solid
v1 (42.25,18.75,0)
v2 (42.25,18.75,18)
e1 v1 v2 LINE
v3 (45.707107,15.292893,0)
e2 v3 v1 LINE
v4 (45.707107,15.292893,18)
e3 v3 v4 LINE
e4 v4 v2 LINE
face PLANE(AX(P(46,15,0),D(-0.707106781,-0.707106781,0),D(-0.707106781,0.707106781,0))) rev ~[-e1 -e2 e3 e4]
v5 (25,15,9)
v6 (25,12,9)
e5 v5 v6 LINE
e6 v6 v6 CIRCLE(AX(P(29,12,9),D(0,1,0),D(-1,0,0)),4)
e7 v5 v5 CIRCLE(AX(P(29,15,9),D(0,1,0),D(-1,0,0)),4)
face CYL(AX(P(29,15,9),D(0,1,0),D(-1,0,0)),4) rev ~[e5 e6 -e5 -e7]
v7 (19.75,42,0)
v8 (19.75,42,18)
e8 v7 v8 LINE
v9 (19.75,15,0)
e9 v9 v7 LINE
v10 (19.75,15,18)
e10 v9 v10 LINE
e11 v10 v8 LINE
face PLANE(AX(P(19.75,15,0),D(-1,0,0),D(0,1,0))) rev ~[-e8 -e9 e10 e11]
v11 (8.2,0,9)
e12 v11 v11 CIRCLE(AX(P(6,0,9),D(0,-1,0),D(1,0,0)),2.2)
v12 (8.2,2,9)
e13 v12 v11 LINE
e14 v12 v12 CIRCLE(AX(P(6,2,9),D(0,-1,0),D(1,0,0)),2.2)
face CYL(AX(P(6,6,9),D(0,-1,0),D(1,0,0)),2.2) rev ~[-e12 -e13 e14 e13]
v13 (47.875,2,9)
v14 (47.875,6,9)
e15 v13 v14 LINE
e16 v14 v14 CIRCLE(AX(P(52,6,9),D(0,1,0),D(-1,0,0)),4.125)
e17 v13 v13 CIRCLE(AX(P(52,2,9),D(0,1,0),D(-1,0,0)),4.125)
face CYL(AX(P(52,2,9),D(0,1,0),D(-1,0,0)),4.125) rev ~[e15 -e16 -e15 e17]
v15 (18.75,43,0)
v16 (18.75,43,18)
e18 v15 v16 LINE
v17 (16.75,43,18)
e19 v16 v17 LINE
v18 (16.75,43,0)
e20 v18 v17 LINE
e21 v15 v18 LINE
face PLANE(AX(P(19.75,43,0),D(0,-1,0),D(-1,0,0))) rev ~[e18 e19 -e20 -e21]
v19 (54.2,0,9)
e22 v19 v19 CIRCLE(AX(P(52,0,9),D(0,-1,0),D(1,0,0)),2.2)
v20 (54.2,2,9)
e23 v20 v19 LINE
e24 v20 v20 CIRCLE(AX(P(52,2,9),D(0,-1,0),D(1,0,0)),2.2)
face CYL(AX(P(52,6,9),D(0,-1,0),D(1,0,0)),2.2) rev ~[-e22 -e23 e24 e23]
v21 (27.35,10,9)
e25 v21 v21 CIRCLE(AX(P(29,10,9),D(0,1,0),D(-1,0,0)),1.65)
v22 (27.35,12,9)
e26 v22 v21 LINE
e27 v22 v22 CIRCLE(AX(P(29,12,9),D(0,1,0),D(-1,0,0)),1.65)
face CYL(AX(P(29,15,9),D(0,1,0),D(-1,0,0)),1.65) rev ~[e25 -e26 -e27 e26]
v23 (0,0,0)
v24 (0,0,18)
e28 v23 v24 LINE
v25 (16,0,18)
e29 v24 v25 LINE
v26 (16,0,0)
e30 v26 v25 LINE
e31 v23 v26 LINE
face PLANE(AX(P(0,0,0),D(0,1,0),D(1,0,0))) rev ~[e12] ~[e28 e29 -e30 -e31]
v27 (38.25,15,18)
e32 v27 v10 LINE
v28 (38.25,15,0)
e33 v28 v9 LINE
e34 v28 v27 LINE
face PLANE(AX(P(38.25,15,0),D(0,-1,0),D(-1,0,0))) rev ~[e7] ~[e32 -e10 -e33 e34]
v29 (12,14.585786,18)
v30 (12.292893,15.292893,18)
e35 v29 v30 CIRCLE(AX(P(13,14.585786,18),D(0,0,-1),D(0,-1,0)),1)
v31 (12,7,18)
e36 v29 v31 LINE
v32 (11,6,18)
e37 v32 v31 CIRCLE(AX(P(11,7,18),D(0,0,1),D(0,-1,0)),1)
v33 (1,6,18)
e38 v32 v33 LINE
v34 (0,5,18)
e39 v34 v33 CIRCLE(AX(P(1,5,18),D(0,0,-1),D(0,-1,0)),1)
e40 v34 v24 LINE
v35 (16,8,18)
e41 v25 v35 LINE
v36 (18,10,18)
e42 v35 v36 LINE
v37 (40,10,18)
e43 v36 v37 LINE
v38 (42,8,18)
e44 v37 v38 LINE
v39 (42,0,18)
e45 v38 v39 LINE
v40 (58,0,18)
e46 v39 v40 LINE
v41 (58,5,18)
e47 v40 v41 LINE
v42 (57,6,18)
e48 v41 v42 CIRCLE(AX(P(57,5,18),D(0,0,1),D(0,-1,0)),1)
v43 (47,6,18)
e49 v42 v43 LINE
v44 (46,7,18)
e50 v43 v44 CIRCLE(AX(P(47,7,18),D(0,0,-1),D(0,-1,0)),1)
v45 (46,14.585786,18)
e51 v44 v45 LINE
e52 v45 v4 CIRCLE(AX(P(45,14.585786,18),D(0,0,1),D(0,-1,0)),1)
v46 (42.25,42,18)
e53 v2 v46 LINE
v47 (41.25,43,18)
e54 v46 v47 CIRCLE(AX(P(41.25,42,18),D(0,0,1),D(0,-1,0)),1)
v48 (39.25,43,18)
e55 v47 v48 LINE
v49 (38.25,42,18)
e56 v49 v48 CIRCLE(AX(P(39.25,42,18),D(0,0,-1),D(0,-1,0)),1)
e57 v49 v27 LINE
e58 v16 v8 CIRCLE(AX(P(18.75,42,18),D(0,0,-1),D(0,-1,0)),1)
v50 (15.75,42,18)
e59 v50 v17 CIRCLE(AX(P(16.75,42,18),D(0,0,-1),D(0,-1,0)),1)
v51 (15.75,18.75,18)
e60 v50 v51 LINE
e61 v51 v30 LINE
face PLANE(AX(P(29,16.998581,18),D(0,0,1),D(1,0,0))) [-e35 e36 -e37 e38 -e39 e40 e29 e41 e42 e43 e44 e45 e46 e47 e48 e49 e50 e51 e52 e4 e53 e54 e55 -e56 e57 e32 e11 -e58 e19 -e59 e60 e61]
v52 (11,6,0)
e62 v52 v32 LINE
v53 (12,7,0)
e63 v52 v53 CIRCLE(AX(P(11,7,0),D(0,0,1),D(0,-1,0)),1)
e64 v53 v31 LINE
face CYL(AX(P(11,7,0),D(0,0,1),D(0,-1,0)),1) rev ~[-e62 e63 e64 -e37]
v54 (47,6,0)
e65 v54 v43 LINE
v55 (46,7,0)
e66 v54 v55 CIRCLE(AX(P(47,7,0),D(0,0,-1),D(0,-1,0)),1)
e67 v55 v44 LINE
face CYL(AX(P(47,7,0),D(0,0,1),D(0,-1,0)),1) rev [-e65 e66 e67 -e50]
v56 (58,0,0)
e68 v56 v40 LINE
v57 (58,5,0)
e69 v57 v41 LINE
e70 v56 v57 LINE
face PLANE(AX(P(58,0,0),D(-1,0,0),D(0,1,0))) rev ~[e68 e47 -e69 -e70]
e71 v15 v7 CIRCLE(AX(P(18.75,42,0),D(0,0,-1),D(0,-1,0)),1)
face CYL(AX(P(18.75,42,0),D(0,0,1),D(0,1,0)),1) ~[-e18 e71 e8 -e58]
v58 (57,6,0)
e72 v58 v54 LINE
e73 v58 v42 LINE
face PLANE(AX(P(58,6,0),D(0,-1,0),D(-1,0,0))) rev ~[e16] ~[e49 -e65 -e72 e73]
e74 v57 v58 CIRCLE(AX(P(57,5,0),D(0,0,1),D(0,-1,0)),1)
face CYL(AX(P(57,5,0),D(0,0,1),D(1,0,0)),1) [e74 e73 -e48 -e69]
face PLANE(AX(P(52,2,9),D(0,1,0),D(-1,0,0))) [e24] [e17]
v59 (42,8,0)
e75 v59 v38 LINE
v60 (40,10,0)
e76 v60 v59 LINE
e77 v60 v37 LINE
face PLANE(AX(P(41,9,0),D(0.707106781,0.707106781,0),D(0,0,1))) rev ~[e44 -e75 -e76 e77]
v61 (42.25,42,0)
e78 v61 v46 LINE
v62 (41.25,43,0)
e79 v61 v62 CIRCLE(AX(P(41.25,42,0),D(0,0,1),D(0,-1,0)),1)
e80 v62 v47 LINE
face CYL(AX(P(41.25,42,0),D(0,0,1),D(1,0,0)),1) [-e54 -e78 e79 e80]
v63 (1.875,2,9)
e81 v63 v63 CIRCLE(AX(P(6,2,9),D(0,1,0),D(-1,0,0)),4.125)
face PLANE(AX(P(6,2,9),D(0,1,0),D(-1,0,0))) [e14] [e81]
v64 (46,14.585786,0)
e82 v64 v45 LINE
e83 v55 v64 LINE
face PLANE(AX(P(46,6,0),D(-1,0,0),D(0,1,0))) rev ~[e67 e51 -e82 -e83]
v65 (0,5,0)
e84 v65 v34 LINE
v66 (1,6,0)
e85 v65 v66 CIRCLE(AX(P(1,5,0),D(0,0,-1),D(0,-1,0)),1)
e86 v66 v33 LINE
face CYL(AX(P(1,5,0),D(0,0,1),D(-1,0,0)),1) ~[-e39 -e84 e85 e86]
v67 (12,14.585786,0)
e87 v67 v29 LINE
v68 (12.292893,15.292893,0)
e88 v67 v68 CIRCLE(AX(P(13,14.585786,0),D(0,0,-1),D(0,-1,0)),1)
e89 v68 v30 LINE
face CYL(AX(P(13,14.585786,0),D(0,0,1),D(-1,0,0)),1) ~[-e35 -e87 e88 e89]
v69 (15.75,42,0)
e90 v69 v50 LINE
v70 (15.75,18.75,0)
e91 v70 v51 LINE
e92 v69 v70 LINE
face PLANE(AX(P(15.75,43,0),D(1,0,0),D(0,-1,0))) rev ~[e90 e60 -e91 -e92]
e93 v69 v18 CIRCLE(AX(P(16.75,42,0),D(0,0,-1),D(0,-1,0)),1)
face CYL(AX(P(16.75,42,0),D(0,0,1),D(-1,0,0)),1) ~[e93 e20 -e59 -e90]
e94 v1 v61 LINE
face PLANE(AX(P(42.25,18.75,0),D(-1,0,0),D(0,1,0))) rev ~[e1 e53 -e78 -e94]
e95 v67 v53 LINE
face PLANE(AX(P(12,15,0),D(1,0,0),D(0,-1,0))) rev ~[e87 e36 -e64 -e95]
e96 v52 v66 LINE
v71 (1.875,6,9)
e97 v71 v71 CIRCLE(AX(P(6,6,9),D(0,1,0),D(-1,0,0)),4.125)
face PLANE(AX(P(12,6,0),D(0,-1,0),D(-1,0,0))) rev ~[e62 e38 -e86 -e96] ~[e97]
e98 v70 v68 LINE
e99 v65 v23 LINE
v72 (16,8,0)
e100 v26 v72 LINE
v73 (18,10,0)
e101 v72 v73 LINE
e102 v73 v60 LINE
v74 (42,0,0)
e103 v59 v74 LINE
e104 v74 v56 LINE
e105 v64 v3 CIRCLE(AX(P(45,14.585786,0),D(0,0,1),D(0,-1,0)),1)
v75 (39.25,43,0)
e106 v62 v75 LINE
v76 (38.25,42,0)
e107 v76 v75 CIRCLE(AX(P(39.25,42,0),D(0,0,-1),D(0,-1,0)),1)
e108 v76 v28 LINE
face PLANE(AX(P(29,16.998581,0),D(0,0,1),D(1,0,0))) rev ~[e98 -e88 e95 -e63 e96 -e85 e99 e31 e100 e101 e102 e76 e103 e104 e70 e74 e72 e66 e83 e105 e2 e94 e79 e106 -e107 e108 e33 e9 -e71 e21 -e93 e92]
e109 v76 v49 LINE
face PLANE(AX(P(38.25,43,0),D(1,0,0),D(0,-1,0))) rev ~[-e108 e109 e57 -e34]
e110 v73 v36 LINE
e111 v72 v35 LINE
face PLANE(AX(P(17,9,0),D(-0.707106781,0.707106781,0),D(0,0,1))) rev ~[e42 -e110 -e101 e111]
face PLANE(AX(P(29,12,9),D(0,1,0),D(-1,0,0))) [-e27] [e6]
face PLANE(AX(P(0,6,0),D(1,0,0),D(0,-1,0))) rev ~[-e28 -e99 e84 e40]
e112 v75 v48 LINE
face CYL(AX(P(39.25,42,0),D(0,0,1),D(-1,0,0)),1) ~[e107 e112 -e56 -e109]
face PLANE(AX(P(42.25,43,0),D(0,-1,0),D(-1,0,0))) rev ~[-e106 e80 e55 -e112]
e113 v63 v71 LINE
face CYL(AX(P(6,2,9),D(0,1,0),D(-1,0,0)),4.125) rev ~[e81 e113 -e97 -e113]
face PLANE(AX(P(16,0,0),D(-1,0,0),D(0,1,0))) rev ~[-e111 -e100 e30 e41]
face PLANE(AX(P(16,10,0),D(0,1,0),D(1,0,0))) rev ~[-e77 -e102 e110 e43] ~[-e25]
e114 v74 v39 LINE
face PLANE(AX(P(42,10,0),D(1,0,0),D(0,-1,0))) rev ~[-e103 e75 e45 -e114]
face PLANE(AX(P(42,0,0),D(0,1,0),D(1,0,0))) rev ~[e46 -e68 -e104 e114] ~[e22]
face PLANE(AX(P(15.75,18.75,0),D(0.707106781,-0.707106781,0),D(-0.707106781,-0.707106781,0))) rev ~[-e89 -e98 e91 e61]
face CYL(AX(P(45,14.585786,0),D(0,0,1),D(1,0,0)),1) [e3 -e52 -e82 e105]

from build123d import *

# Parameters (mm, degrees)
F1_DEPTH             = 18
F4_D                 = 4.4
F4_CBORE_D           = 8.25
F4_CBORE_DEPTH       = 4
F4_ON_F3_D           = 4.4
F4_ON_F3_CBORE_D     = 8.25
F4_ON_F3_CBORE_DEPTH = 4
F5_SIZE              = 2
F6_R                 = 1
F7_R                 = 1.65
F8_DEPTH             = 15.001
F9_R                 = 4
F10_DEPTH            = 3


with BuildPart() as f1:
    # F0 (on Top) → F1 (new body)
    with BuildSketch(Plane.XY):
        Polygon((0, 6), (0, 0), (16, 0), (16, 10), (42, 10), (42, 0), (58, 0), (58, 6), (46, 6), (46, 15), (42.25, 18.75), (42.25, 43), (38.25, 43), (38.25, 15), (19.75, 15), (19.75, 43), (15.75, 43), (15.75, 18.75), (12, 15), (12, 6), align=None)
    extrude(amount=F1_DEPTH)

    # F4 (through all)
    with Locations(Plane(origin=(0, 6, 0), x_dir=(-1, 0, 0), z_dir=(0, 1, 0))):
        with Locations((-52, 9)):
            CounterBoreHole(F4_D / 2, F4_CBORE_D / 2, F4_CBORE_DEPTH)

    # F4 on F3 (through all)
    with Locations(Plane(origin=(0, 6, 0), x_dir=(-1, 0, 0), z_dir=(0, 1, 0))):
        with Locations((-6, 9)):
            CounterBoreHole(F4_ON_F3_D / 2, F4_ON_F3_CBORE_D / 2, F4_ON_F3_CBORE_DEPTH)

    # F5
    f5_edges = [f1.edges().sort_by_distance(p)[0] for p in [
        (16, 10, 9),
        (42, 10, 9),
    ]]
    chamfer(f5_edges, length=F5_SIZE)

    # F6
    f6_edges = [f1.edges().sort_by_distance(p)[0] for p in [
        (46, 6, 9),
        (38.25, 43, 9),
        (19.75, 43, 9),
        (12, 6, 9),
        (0, 6, 9),
        (58, 6, 9),
        (12, 15, 9),
        (15.75, 43, 9),
        (46, 15, 9),
        (42.25, 43, 9),
    ]]
    fillet(f6_edges, radius=F6_R)

    # F7 (on face) → F8 (cut, through all)
    with BuildSketch(Plane(origin=(0, 15, 0), x_dir=(-1, 0, 0), z_dir=(0, 1, 0))):
        with Locations((-29, 9)):
            Circle(F7_R)
    extrude(amount=-F8_DEPTH, mode=Mode.SUBTRACT)

    # F9 (on face) → F10 (cut)
    with BuildSketch(Plane(origin=(0, 15, 0), x_dir=(-1, 0, 0), z_dir=(0, 1, 0))):
        with Locations((-29, 9)):
            Circle(F9_R)
    extrude(amount=-F10_DEPTH, mode=Mode.SUBTRACT)


solid = f1.part
